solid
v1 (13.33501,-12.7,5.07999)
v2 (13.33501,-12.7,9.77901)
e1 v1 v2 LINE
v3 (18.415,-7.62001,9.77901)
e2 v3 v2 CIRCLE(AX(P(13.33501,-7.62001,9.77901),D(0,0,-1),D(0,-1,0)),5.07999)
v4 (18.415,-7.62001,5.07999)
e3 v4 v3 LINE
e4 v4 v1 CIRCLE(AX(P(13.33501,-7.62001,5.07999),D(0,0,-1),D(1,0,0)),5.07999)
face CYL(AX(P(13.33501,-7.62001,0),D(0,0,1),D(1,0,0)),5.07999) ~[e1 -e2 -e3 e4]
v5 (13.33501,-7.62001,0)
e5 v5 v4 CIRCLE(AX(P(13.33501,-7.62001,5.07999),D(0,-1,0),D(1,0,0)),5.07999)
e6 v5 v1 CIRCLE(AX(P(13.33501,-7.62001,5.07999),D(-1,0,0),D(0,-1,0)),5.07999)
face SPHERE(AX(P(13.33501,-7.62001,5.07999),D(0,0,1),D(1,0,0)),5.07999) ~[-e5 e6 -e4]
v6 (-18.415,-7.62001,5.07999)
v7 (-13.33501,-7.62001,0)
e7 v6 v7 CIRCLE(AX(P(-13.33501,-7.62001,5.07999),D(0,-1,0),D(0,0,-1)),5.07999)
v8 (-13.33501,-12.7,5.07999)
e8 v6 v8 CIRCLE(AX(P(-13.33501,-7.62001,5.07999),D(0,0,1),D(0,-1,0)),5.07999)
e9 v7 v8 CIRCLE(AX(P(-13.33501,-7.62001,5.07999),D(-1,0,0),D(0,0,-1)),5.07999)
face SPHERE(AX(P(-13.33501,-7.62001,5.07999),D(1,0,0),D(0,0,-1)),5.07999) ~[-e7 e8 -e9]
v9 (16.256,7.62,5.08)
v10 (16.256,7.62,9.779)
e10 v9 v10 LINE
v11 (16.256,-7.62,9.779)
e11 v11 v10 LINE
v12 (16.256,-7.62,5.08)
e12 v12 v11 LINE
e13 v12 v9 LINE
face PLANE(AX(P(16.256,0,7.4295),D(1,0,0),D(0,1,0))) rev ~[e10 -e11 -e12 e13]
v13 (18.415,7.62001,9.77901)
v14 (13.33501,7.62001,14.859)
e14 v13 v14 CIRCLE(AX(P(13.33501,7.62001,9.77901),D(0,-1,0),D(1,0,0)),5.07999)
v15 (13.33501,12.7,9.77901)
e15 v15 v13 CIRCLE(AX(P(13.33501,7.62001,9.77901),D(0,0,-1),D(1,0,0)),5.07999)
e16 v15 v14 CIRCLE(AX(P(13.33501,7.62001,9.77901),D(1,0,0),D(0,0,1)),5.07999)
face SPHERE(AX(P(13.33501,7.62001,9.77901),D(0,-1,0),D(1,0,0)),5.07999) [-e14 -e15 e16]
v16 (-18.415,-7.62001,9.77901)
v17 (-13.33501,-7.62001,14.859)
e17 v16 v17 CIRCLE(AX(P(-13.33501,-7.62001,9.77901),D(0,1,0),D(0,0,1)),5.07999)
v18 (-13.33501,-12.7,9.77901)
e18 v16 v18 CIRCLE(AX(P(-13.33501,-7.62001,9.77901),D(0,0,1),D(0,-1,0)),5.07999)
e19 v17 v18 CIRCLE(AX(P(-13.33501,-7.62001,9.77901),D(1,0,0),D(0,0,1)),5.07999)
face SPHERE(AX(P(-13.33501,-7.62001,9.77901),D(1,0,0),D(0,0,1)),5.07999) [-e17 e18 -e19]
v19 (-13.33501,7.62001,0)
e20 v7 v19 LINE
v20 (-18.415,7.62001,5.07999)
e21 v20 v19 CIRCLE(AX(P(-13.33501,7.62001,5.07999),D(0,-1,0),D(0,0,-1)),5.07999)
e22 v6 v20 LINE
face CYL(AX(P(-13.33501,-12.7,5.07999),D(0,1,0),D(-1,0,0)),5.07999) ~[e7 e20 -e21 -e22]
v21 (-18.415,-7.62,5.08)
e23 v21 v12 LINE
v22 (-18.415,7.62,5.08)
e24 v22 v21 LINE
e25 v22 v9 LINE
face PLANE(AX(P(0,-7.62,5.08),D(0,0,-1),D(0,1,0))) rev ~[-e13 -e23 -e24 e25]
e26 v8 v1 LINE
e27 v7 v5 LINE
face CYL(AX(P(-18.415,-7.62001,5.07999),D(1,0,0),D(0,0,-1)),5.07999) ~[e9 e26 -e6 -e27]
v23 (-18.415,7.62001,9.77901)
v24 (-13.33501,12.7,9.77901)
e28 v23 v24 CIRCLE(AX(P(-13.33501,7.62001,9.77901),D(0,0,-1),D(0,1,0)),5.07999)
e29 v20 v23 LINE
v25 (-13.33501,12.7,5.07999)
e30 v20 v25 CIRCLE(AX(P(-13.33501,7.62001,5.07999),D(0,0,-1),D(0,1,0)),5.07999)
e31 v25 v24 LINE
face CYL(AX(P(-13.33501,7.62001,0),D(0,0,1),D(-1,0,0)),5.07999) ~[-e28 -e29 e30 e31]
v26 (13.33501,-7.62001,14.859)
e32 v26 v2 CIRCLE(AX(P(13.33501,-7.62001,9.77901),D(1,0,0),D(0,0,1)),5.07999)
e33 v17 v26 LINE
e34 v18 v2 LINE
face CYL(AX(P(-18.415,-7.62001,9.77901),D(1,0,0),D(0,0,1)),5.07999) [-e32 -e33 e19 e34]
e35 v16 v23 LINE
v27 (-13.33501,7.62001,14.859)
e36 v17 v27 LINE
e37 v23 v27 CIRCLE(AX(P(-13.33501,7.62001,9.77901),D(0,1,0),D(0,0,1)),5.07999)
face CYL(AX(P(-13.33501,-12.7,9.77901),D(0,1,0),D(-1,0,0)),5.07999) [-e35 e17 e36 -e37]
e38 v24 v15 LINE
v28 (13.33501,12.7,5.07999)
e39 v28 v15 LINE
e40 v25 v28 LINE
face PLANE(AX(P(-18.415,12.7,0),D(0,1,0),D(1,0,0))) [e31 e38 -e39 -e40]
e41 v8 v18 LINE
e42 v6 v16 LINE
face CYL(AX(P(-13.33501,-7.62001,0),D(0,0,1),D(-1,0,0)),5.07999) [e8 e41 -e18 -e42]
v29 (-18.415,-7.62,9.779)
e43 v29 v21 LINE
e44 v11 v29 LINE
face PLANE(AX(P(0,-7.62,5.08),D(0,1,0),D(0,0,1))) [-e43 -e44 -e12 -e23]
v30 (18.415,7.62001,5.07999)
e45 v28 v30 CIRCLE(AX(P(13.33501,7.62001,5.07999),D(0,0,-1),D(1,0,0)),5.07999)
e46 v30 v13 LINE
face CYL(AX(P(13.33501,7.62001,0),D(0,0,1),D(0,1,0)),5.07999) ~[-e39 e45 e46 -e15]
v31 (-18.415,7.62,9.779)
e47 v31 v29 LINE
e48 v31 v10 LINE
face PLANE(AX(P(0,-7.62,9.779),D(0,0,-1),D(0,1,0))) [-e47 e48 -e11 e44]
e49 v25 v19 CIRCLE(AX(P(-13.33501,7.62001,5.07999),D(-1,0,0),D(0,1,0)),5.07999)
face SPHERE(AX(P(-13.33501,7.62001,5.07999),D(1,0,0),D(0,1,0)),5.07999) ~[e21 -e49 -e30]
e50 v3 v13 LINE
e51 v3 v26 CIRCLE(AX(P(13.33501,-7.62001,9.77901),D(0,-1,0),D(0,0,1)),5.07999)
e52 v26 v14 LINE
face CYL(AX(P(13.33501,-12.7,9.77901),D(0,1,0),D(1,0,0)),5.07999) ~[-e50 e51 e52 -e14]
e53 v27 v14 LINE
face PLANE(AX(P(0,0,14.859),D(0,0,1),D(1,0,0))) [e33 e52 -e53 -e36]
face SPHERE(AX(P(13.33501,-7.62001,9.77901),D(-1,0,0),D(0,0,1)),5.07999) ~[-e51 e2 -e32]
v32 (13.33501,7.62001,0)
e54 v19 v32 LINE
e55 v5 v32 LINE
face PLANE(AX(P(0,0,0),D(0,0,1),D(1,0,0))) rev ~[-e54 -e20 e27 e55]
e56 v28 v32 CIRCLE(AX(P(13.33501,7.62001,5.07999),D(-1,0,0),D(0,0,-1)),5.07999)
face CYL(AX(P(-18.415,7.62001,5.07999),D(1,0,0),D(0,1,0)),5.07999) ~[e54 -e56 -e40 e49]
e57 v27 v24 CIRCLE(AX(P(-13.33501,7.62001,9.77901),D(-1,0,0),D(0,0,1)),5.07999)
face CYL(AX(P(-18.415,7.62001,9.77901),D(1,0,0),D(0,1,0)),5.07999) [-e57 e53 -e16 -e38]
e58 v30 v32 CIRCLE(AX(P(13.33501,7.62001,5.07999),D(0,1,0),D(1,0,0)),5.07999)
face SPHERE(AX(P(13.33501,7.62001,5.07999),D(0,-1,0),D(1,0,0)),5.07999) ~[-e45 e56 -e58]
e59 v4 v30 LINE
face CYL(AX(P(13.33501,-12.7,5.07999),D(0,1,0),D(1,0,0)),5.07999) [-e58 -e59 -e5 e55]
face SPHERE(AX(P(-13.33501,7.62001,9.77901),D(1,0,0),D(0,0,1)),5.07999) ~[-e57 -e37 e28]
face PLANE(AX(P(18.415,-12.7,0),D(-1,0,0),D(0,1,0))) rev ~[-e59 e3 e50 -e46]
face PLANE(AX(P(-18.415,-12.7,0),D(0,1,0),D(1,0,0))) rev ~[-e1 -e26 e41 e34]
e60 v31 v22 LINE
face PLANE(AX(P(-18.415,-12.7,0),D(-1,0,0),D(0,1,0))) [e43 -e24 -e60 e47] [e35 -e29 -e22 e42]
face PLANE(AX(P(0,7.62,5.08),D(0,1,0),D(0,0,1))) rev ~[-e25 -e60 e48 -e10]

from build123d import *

# Parameters (mm, degrees)
F0_W     = 36.83
F0_H     = 25.4
F1_DEPTH = 14.859
F2_W     = 15.24
F2_H     = 4.699
F3_DEPTH = 18.542
F4_DEPTH = 16.256
F5_R     = 5.07999


# Not quite as in the source:
# - a fillet or chamfer is up to 0.001 mm smaller than in the source, because OpenCascade refuses the exact size


with BuildPart() as f1:
    # F0 (on Top) → F1 (new body)
    with BuildSketch(Plane.XY):
        Rectangle(F0_W, F0_H)
    extrude(amount=F1_DEPTH)

    # F2 (on Right) → F3 (cut)
    with BuildSketch(Plane.YZ):
        with Locations((0, 7.4295)):
            Rectangle(F2_W, F2_H)
    extrude(amount=-F3_DEPTH, mode=Mode.SUBTRACT)

    # F2 (on Right) → F4 (cut)
    with BuildSketch(Plane.YZ):
        with Locations((0, 7.4295)):
            Rectangle(F2_W, F2_H)
    extrude(amount=F4_DEPTH, mode=Mode.SUBTRACT)

    # F5 (radius 5.08 in the source; OpenCascade refuses exactly that, so slightly less here)
    f5_edges = [f1.edges().sort_by_distance(p)[0] for p in [
        (0, -12.7, 14.859),
        (18.415, 0, 14.859),
        (18.415, -12.7, 7.4295),
        (18.415, 0, 0),
        (18.415, 12.7, 7.4295),
        (0, 12.7, 0),
        (0, -12.7, 0),
        (0, 12.7, 14.859),
        (-18.415, 0, 14.859),
        (-18.415, 12.7, 7.4295),
        (-18.415, 0, 0),
        (-18.415, -12.7, 7.4295),
    ]]
    fillet(f5_edges, radius=F5_R)


solid = f1.part
